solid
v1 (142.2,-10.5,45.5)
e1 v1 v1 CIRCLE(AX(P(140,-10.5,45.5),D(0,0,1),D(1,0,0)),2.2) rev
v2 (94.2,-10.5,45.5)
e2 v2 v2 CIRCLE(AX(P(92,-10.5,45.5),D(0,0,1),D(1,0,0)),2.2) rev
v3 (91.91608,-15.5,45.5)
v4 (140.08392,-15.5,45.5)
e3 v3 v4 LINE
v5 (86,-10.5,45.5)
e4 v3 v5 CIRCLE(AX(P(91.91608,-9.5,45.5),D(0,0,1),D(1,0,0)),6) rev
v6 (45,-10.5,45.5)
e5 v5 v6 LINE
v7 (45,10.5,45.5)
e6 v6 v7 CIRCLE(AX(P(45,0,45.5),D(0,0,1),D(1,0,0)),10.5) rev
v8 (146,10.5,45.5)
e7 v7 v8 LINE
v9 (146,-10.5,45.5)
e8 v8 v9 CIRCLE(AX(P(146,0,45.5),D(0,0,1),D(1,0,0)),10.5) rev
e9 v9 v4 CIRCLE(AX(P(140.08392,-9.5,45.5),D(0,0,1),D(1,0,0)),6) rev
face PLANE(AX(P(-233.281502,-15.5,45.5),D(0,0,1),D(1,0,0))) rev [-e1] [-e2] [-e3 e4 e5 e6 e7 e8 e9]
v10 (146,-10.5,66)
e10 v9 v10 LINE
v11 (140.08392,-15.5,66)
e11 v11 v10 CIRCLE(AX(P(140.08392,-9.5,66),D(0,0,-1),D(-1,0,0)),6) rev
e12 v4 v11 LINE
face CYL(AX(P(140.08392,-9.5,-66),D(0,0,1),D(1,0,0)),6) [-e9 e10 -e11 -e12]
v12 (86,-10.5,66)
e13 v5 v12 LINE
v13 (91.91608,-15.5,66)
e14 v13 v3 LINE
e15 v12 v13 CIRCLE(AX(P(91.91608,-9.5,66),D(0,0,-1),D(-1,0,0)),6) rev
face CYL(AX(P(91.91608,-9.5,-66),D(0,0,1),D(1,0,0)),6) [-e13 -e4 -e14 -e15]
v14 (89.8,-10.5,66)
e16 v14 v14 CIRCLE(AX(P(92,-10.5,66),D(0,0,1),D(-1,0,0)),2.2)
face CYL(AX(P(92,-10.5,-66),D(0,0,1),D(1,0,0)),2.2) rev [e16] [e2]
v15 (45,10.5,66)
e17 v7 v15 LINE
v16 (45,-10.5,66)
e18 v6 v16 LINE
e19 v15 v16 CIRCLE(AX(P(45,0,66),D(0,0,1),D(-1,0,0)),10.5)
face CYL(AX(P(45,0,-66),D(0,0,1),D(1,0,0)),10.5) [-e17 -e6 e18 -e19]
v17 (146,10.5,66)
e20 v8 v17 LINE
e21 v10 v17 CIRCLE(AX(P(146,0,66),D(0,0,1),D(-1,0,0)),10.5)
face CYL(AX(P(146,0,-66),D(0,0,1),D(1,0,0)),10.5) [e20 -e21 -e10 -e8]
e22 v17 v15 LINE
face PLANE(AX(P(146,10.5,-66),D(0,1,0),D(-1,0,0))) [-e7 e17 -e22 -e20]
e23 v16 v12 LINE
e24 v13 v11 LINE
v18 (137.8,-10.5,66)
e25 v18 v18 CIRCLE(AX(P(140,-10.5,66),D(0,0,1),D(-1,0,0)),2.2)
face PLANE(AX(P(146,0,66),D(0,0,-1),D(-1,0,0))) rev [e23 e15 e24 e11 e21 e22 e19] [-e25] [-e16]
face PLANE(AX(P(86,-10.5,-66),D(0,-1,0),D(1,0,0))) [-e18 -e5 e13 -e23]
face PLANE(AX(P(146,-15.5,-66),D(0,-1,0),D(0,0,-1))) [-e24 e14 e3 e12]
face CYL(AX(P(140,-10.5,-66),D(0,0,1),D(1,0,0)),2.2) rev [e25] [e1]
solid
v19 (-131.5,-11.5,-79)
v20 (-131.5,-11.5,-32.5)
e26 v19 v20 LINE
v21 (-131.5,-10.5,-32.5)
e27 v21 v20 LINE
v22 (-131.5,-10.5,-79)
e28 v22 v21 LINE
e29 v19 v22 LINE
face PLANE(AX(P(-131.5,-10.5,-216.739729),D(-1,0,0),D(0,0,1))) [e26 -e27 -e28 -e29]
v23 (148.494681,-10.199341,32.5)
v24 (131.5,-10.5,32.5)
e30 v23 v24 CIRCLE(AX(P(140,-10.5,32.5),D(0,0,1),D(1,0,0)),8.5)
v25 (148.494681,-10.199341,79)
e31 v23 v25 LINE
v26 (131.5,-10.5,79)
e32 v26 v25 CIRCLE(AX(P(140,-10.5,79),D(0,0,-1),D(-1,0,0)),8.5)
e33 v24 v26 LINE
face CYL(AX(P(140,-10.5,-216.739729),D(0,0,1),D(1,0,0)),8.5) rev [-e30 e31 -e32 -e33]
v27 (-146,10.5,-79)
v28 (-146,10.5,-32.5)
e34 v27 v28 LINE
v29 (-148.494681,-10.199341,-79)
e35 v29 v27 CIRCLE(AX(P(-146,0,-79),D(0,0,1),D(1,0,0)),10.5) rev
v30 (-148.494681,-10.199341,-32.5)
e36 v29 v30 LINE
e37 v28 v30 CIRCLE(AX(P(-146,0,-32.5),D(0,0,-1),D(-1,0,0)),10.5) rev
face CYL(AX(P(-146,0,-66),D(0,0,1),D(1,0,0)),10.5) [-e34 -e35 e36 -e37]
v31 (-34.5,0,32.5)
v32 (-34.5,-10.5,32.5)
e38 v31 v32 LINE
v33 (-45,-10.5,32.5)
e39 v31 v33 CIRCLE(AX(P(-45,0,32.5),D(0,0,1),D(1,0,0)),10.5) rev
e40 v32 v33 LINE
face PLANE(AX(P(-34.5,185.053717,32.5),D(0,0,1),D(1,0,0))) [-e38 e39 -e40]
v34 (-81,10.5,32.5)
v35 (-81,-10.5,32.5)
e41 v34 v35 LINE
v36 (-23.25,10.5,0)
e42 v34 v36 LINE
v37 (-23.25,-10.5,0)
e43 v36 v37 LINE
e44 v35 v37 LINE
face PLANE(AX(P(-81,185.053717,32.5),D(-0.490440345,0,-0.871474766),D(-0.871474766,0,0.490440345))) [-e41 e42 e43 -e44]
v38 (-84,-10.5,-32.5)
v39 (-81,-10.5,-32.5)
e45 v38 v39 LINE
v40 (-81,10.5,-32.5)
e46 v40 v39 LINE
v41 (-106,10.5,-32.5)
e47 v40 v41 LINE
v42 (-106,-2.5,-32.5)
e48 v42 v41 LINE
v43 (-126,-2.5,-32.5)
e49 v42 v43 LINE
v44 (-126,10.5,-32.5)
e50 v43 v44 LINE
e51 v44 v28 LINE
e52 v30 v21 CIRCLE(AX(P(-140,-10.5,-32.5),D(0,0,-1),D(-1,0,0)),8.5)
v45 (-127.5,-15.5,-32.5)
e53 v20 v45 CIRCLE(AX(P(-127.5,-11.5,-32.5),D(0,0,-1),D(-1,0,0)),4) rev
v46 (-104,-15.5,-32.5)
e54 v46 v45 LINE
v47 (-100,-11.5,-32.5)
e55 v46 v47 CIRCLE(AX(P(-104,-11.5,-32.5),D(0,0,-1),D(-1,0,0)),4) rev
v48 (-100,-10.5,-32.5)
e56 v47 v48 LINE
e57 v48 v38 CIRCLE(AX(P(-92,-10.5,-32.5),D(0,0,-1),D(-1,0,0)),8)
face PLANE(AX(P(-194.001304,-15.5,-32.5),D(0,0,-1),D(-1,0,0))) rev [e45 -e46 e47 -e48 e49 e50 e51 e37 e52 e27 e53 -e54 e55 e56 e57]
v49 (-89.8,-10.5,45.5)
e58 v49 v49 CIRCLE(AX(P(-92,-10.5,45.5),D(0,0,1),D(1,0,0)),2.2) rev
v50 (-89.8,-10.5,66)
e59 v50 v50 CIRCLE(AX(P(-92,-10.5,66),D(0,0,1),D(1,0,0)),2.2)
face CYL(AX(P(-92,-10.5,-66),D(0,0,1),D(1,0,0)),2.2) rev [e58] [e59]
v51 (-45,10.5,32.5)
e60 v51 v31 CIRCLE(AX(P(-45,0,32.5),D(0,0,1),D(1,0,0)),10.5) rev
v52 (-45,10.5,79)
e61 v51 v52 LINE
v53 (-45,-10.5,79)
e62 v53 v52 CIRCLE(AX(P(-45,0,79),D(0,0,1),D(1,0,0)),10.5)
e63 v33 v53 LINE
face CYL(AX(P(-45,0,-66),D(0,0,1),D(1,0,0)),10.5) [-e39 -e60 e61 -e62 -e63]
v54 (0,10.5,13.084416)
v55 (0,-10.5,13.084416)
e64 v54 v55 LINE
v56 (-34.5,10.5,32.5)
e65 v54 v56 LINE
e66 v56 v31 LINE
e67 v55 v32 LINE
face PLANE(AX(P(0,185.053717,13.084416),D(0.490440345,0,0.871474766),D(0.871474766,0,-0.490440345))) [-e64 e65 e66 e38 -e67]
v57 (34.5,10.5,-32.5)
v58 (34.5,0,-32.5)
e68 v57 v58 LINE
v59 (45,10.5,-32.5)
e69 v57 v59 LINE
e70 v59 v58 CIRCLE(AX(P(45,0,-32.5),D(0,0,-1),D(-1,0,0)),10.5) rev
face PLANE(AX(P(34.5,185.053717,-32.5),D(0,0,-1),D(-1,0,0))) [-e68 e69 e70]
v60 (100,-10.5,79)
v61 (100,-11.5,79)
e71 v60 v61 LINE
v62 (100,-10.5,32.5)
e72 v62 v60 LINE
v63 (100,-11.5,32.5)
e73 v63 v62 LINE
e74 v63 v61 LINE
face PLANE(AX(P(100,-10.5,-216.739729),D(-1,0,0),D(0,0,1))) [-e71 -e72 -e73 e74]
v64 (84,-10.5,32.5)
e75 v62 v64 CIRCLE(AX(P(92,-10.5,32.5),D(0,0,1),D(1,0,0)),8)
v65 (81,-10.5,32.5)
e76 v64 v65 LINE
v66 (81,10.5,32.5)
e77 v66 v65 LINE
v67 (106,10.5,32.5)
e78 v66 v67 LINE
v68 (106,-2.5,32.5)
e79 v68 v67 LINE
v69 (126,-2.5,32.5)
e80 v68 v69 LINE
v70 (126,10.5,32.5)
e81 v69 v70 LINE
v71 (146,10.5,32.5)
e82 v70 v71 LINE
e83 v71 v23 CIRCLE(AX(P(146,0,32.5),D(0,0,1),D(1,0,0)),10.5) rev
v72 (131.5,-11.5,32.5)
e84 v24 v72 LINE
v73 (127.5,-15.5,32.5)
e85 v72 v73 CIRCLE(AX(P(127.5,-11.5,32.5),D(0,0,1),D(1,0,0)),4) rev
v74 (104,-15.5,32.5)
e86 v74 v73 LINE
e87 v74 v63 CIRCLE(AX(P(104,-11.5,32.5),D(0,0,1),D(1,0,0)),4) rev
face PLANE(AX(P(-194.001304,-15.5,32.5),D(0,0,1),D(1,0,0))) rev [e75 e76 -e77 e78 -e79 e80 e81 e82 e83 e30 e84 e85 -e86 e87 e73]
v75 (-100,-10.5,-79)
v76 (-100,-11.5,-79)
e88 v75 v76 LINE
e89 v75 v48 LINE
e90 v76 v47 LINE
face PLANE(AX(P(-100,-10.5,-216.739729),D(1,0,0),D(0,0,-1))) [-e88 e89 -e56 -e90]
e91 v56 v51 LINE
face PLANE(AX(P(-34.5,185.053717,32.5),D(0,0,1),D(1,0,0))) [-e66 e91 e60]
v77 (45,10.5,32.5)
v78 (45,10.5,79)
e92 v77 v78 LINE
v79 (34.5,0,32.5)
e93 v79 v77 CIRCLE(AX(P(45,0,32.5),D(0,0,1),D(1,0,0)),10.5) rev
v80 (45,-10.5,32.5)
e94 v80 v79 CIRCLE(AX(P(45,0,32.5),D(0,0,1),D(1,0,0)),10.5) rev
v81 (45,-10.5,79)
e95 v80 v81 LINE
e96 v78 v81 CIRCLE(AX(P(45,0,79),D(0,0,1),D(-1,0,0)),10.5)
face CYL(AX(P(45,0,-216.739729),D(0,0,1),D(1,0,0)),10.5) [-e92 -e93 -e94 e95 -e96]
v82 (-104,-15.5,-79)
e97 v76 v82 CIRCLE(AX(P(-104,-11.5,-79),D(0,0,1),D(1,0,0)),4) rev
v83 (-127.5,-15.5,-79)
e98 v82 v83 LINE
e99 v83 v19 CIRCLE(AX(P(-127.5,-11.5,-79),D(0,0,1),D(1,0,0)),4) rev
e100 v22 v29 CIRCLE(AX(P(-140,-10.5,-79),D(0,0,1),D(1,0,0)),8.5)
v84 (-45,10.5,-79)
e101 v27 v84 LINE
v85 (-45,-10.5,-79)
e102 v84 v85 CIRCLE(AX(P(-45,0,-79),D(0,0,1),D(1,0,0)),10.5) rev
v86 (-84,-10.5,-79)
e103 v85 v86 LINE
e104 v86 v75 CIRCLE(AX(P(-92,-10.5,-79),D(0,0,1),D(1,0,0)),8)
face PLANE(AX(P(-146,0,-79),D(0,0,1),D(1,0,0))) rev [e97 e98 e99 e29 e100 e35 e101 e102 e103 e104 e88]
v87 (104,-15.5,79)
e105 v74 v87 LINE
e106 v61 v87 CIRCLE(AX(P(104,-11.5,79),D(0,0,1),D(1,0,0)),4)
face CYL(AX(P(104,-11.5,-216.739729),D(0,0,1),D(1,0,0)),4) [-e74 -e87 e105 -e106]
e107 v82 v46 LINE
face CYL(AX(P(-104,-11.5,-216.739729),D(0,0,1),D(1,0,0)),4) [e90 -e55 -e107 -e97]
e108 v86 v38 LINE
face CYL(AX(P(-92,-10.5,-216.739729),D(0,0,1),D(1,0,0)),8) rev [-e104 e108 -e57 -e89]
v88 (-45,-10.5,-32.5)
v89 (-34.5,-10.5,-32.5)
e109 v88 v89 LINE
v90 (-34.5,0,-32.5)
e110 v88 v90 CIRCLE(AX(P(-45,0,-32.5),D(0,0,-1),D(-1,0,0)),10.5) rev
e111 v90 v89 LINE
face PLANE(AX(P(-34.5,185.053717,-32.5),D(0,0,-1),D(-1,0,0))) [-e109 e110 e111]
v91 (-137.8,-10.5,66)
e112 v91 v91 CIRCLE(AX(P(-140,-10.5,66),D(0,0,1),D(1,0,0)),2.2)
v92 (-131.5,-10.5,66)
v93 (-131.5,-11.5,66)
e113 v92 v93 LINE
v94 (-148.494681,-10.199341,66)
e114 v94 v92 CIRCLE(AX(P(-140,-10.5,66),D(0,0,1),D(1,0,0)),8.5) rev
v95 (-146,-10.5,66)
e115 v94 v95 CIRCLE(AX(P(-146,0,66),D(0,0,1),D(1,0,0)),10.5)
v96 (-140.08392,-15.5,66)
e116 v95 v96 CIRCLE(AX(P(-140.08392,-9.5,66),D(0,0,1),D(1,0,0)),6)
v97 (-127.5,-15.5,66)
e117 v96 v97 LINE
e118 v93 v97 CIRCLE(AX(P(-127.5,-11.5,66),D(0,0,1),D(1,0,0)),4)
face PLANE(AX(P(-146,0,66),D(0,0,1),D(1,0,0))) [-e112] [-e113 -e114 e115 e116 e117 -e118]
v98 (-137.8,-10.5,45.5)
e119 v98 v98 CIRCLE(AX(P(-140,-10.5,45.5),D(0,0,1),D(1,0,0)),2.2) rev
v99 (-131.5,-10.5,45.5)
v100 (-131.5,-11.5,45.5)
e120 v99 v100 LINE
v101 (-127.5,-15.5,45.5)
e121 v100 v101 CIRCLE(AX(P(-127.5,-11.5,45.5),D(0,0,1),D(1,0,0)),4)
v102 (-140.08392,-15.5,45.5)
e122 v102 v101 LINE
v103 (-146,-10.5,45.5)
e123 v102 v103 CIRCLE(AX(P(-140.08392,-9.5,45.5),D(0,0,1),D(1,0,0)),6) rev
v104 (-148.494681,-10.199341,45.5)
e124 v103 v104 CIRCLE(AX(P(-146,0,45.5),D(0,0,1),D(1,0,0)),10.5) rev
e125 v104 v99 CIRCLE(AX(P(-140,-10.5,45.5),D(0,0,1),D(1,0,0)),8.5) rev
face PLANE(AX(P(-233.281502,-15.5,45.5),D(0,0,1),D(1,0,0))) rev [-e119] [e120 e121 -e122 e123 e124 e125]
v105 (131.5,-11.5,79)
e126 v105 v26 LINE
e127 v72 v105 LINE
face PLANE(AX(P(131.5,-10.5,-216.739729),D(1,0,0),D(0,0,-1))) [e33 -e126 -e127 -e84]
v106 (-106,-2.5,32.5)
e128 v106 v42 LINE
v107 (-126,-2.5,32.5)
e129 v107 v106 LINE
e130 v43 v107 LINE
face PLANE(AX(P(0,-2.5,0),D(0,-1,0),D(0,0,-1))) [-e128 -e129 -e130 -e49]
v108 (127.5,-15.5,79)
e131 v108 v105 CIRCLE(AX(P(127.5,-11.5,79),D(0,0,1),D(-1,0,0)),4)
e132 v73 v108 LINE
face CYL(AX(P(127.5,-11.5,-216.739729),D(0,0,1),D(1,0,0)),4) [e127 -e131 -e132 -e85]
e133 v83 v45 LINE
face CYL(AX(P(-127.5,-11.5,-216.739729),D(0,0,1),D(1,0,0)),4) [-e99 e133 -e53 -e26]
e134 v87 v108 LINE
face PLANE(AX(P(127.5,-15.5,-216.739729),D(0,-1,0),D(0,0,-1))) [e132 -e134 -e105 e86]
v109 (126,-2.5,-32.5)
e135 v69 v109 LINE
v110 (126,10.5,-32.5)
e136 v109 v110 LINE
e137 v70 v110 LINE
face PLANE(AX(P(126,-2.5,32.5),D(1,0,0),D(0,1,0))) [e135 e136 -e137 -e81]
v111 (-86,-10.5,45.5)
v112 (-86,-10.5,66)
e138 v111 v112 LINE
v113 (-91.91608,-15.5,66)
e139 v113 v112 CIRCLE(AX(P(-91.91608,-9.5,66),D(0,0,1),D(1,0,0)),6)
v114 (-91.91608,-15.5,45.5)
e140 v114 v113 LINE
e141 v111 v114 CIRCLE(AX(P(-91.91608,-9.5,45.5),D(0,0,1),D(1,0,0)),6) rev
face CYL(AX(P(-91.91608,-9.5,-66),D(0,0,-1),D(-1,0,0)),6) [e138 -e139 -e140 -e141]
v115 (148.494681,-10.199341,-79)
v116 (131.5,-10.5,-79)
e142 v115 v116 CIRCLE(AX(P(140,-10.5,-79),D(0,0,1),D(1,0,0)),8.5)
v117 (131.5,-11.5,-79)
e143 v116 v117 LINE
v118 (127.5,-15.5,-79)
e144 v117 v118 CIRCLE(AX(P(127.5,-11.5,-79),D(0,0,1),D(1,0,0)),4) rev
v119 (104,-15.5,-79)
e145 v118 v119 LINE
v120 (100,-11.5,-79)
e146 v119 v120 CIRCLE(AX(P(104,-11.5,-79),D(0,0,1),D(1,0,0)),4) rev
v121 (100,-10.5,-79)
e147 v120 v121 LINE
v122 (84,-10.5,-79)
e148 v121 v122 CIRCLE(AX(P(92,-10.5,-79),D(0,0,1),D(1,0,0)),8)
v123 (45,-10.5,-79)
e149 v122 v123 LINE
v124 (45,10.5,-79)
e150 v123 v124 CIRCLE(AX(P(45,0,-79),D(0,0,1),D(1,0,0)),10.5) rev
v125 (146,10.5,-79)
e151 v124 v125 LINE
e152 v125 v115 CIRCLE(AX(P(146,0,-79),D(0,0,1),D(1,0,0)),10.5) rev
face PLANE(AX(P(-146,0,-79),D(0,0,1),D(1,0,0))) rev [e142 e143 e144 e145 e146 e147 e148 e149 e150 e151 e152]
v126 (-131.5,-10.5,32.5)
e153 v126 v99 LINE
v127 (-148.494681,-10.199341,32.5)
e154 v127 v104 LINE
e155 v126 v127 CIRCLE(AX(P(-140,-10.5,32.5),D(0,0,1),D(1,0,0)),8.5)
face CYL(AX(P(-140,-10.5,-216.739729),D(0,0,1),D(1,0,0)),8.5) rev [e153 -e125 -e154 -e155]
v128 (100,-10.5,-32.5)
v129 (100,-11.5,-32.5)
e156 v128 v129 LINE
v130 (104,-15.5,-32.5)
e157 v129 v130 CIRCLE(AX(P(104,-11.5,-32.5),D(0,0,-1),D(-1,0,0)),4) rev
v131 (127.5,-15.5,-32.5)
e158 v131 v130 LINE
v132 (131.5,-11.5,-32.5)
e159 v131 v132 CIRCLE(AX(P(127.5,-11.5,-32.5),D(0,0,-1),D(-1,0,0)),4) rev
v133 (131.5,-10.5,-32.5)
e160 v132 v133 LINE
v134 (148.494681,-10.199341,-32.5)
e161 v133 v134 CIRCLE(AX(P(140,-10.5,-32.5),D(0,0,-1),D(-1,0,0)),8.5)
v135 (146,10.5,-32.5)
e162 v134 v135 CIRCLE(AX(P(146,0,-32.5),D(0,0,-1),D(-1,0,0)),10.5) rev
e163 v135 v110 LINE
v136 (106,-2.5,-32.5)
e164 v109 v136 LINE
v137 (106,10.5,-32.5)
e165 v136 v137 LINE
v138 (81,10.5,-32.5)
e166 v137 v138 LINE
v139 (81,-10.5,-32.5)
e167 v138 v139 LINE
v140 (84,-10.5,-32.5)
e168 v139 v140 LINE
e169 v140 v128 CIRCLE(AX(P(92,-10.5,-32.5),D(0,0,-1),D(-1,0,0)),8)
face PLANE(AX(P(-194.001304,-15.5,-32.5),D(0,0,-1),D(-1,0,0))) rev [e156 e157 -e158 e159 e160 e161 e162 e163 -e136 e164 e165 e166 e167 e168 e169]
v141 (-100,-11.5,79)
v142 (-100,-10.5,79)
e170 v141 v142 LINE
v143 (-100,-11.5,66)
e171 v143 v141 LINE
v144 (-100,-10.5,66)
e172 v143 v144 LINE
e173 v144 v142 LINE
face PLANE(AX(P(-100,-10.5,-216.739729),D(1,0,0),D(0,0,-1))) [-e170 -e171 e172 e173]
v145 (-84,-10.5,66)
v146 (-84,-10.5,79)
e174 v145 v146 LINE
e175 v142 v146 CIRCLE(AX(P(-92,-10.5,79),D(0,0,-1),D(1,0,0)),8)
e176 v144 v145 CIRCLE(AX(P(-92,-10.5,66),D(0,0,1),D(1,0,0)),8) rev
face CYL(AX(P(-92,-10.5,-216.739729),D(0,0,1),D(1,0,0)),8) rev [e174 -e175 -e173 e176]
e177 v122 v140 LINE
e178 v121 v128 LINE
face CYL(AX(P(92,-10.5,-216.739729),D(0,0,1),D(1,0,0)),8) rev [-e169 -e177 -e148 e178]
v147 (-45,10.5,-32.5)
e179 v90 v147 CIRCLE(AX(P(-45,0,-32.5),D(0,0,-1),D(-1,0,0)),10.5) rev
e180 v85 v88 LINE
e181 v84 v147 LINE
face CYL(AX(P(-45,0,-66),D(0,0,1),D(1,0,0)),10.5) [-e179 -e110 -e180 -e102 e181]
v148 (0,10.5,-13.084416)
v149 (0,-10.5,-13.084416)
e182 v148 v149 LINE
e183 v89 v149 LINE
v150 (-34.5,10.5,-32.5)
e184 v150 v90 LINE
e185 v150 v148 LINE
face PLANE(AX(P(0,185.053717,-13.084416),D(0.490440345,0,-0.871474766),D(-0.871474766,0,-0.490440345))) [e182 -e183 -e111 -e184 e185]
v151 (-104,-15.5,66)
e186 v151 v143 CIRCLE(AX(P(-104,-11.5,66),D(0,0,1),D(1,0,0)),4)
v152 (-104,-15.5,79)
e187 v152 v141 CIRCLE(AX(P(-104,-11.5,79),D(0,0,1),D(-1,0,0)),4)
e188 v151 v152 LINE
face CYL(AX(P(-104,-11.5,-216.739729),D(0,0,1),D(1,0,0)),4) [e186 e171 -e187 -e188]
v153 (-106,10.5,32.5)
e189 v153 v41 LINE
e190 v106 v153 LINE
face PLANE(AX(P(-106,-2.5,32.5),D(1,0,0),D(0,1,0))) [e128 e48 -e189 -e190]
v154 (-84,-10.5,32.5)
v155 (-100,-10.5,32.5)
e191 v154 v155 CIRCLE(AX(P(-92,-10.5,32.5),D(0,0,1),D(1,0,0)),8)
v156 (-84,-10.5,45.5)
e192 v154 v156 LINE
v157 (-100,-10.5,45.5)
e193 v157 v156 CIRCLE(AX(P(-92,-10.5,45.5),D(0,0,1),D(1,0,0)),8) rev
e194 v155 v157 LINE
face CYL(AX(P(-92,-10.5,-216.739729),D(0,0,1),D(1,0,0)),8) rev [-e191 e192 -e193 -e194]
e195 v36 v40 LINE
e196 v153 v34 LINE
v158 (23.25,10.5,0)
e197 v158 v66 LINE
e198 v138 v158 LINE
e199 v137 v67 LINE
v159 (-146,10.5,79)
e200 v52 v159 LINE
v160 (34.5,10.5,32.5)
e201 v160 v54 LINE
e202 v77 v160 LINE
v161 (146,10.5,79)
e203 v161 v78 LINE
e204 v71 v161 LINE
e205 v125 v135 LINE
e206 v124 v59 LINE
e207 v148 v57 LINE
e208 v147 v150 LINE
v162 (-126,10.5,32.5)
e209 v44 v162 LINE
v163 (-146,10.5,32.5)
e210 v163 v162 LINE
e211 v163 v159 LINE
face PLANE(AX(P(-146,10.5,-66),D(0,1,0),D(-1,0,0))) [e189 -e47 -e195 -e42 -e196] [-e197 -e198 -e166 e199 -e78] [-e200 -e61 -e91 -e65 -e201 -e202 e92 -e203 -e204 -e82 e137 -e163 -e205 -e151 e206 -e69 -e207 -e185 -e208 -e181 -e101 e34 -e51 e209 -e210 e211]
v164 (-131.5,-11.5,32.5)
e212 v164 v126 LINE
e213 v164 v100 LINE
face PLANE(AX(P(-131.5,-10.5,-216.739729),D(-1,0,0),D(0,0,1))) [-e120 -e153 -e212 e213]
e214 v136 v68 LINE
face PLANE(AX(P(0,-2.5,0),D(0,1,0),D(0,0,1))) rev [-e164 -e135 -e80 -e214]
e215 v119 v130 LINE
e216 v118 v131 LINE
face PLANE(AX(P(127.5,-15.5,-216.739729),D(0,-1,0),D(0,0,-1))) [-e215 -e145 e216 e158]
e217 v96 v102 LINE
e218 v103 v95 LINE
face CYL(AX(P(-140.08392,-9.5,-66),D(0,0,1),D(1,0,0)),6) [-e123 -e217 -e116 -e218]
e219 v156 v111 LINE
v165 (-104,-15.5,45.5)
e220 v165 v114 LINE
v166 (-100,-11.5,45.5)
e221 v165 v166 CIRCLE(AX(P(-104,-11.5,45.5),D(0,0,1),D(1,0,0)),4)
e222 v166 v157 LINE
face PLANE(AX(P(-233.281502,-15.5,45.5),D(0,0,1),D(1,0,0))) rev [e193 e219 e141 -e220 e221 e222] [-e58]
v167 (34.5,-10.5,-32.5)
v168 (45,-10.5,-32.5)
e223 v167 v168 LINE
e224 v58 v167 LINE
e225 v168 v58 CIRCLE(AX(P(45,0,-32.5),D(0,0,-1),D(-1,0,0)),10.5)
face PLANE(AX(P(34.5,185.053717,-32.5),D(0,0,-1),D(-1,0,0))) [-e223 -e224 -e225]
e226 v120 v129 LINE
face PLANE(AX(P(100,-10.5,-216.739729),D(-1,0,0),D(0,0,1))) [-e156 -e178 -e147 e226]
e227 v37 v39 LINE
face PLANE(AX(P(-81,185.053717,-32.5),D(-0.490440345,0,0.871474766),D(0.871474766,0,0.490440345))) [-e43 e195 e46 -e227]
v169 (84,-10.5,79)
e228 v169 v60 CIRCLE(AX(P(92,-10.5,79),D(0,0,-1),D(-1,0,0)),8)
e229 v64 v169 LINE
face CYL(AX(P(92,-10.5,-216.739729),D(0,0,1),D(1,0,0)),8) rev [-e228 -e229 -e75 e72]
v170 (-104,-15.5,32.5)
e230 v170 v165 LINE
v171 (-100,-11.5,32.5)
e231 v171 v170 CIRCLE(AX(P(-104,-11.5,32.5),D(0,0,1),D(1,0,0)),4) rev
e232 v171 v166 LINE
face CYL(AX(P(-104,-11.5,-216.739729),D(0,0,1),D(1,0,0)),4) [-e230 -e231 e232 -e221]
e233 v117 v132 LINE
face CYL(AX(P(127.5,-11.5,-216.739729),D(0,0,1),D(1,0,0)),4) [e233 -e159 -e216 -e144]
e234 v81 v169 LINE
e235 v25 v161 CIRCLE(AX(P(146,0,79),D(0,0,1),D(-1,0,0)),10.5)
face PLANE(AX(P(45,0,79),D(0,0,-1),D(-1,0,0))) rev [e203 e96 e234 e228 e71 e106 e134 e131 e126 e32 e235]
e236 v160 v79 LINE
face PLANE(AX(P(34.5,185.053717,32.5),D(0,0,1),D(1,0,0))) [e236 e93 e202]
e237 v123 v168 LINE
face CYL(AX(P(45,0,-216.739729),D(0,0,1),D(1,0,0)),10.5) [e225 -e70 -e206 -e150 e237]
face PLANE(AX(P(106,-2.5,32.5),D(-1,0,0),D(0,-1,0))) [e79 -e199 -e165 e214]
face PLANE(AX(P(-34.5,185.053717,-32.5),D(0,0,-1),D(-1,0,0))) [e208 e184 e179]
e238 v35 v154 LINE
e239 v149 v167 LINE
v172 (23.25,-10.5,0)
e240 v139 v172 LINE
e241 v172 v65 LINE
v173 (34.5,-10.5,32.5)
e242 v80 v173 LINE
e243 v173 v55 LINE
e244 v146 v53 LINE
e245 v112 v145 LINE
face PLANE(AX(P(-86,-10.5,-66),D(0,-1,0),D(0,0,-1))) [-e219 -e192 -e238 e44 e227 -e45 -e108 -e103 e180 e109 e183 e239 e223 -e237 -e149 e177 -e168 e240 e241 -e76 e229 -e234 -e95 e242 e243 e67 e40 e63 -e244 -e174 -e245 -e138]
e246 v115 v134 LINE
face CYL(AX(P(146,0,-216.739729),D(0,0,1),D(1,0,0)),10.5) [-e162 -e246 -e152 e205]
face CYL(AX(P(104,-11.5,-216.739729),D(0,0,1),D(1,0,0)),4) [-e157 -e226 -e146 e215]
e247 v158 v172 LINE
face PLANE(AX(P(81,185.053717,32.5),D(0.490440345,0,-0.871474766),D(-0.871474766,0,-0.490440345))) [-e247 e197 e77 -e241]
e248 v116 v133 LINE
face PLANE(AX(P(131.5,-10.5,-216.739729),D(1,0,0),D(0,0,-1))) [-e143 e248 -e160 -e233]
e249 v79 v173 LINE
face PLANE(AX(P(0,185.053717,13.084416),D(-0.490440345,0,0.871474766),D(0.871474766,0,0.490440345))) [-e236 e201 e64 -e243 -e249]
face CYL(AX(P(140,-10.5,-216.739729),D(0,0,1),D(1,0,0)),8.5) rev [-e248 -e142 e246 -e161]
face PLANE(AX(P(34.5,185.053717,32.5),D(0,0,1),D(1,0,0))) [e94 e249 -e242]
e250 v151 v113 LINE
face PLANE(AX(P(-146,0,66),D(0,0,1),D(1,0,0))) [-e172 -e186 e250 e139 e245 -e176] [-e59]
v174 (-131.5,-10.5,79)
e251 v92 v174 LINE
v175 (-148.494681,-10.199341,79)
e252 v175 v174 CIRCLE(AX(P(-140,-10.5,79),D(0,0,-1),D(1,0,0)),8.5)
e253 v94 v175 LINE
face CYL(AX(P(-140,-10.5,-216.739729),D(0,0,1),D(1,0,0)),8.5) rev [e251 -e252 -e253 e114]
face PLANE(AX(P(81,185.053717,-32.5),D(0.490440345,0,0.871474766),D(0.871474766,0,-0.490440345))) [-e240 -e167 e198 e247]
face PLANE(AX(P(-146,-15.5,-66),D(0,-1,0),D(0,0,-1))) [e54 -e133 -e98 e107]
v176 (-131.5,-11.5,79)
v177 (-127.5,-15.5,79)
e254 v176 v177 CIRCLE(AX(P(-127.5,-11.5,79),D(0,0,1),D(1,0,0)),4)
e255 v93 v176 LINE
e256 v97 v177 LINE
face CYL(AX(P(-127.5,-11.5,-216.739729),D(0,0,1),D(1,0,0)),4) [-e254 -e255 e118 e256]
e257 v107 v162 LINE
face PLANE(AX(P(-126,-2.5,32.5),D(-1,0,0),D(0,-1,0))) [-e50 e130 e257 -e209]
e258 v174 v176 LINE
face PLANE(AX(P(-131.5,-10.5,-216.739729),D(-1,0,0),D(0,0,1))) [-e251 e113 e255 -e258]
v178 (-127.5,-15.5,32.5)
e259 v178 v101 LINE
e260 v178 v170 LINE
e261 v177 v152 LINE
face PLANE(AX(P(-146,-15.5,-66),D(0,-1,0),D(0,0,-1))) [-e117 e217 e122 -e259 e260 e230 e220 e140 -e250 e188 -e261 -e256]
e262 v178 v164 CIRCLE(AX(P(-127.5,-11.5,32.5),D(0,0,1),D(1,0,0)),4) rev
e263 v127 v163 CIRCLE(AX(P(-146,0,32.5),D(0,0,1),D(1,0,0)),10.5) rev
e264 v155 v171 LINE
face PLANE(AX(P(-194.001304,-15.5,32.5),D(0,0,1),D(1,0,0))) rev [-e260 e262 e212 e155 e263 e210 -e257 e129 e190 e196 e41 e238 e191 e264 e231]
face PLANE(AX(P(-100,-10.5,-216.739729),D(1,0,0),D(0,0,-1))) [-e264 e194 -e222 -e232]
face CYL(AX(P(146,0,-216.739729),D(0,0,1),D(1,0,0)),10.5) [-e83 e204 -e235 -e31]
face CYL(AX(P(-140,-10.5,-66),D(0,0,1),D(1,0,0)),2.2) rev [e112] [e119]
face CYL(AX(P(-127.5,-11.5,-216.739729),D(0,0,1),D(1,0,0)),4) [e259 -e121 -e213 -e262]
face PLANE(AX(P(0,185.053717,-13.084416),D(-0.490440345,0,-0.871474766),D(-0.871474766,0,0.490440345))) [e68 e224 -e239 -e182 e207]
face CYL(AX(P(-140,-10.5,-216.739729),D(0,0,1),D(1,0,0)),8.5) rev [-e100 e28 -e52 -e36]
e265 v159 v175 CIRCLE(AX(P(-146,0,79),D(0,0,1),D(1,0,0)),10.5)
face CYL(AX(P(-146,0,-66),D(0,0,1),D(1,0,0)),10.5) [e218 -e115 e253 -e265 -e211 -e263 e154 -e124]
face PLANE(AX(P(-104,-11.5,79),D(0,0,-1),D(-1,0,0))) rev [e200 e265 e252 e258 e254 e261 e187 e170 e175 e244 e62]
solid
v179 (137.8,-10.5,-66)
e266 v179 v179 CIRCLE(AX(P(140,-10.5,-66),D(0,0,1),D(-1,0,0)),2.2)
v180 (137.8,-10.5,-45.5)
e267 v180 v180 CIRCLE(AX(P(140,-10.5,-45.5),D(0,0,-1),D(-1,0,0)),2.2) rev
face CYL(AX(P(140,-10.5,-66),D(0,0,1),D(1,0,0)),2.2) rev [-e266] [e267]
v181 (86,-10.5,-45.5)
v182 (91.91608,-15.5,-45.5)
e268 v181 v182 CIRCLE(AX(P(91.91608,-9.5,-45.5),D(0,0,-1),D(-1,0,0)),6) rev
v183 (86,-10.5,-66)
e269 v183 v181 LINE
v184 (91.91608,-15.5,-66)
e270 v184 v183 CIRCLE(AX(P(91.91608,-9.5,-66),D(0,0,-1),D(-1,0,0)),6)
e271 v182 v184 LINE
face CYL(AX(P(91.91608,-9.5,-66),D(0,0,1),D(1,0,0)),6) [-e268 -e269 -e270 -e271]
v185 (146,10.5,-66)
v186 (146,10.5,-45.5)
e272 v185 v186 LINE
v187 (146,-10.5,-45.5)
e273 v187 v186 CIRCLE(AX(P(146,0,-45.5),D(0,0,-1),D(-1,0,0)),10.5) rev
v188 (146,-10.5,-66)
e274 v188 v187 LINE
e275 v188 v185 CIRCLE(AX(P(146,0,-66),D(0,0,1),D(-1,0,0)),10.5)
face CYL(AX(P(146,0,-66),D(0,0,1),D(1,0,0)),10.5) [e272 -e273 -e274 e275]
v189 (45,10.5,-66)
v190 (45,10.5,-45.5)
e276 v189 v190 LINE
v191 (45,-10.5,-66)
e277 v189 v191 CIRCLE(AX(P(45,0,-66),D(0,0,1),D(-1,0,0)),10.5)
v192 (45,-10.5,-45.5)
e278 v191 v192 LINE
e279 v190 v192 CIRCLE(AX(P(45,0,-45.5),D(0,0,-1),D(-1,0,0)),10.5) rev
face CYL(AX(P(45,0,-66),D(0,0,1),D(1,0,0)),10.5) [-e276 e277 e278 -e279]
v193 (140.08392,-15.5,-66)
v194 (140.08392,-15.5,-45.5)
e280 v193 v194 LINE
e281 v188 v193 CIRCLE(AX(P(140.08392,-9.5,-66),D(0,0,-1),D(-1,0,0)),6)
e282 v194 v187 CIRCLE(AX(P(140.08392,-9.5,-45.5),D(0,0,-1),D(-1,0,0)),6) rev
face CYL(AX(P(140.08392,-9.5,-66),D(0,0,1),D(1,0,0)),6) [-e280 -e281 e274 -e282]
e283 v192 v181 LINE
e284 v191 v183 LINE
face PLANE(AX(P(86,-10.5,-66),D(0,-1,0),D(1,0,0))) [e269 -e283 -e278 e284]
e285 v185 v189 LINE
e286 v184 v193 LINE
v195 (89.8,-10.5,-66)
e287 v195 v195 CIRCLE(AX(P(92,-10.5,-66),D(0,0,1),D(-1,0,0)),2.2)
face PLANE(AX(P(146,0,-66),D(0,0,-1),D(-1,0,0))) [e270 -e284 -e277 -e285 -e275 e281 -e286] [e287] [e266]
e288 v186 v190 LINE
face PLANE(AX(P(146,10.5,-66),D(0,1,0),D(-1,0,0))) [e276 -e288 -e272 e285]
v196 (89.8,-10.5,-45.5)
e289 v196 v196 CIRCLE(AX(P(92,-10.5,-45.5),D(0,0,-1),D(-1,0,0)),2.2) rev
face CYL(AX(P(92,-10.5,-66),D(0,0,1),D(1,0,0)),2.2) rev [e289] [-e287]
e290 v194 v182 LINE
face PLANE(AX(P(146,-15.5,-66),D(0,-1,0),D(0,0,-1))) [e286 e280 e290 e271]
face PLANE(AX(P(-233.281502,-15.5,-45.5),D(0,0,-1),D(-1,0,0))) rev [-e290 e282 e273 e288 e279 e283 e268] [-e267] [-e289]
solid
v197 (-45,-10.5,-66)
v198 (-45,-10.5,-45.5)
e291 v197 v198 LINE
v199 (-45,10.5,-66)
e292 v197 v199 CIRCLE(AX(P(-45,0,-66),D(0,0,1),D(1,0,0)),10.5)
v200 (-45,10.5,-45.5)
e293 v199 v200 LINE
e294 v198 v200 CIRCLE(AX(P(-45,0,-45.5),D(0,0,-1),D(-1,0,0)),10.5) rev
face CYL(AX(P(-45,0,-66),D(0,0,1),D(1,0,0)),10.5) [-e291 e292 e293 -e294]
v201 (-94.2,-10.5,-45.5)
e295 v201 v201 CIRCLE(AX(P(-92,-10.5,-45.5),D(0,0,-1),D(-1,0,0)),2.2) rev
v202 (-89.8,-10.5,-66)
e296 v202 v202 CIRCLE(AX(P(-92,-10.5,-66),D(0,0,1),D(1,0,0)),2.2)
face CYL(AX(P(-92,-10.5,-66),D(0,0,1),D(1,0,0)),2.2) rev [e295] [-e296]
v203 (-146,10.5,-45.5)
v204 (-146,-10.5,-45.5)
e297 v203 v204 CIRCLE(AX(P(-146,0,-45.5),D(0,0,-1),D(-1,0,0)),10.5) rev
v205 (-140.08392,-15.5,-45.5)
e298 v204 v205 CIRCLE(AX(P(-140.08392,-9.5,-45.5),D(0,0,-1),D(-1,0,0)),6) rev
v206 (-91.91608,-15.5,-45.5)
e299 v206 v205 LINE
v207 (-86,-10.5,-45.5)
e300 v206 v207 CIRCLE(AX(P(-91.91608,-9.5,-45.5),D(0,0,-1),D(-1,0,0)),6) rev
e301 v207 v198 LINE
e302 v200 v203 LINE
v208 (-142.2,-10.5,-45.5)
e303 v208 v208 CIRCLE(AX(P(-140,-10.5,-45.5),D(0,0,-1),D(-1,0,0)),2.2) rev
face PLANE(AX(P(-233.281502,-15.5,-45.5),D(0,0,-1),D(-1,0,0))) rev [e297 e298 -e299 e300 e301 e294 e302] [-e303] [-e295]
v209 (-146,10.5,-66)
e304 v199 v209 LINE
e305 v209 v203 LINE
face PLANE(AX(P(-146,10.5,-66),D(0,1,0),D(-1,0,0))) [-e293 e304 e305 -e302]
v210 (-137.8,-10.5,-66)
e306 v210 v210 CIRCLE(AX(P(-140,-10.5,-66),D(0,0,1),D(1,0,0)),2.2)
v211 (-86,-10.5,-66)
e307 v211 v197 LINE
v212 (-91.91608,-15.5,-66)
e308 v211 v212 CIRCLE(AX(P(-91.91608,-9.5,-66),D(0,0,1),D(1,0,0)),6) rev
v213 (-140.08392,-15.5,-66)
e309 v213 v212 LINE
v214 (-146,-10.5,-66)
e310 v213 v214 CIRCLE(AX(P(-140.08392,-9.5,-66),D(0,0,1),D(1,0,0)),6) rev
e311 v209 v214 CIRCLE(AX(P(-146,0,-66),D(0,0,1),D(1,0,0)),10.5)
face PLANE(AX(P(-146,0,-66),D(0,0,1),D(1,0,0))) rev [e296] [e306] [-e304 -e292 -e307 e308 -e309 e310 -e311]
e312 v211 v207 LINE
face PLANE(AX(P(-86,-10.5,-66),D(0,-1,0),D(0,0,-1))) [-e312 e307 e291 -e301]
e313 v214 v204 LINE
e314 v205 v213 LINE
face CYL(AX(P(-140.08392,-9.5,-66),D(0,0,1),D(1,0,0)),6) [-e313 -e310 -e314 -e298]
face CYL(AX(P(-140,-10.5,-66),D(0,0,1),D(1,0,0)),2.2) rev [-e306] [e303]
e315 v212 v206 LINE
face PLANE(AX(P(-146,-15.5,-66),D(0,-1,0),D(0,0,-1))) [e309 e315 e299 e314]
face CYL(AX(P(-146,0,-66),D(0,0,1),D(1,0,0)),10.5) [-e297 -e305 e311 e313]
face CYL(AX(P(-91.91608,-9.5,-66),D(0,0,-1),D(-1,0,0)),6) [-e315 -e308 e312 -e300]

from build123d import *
from build123d.topology import SkipClean

# Parameters (mm, degrees)
BOSS_EXTRUDE9_DEPTH        = 66
BOSS_EXTRUDE9_DEPTH_BACK   = 66
SKETCH14_R                 = 2.2
BOSS_EXTRUDE9_2_DEPTH      = 66
BOSS_EXTRUDE9_2_DEPTH_BACK = 66
SKETCH16_W                 = 465.18759692
SKETCH16_H                 = 91
CUT_EXTRUDE7_DEPTH         = 172.826220351
FILLET1_R                  = 6
FILLET2_R                  = 6
FILLET3_R                  = 6
FILLET5_R                  = 6
BOSS_EXTRUDE10_DEPTH       = 13
BOSS_EXTRUDE10_DEPTH_BACK  = 145
SKETCH22_W                 = 388.002608152
SKETCH22_H                 = 65
CUT_EXTRUDE8_DEPTH         = 178.22654993
BOSS_EXTRUDE11_REACH       = 178.562
SKETCH25_W                 = 20
SKETCH25_H                 = 65
BOSS_EXTRUDE12_DEPTH       = 13


with BuildPart() as part:
    # Sketch14 → Boss-Extrude9 (new, two sides: drawn at the far end of the back side and taken through both)
    with BuildSketch(Plane.XY.offset(-BOSS_EXTRUDE9_DEPTH_BACK)):
        with BuildLine():
            Line((-146, 10.5), (-45, 10.5))
            ThreePointArc((-45, 10.5), (-34.5, 0), (-45, -10.5))
            Line((-45, -10.5), (-86, -10.5))
            Line((-86, -10.5), (-86, -15.5))
            Line((-86, -15.5), (-146, -15.5))
            Line((-146, -15.5), (-146, -10.5))
            ThreePointArc((-146, -10.5), (-156.5, 0), (-146, 10.5))
        make_face()
        with Locations((-140, -10.5)):
            Circle(SKETCH14_R, mode=Mode.SUBTRACT)
        with Locations((-92, -10.5)):
            Circle(SKETCH14_R, mode=Mode.SUBTRACT)
    extrude(amount=BOSS_EXTRUDE9_DEPTH + BOSS_EXTRUDE9_DEPTH_BACK)


with BuildPart() as body_2:
    # Sketch14 → Boss-Extrude9 2 (new, two sides: drawn at the far end of the back side and taken through both)
    with BuildSketch(Plane.XY.offset(-BOSS_EXTRUDE9_2_DEPTH_BACK)):
        with BuildLine():
            Line((146, -15.5), (146, -10.5))
            ThreePointArc((146, -10.5), (156.5, 0), (146, 10.5))
            Line((146, 10.5), (45, 10.5))
            ThreePointArc((45, 10.5), (34.5, 0), (45, -10.5))
            Line((45, -10.5), (86, -10.5))
            Line((86, -10.5), (86, -15.5))
            Line((86, -15.5), (146, -15.5))
        make_face()
        with Locations(Location((92, -10.5, 0), (0, 0, 180))):
            Circle(SKETCH14_R, mode=Mode.SUBTRACT)
        with Locations(Location((140, -10.5, 0), (0, 0, 180))):
            Circle(SKETCH14_R, mode=Mode.SUBTRACT)
    extrude(amount=BOSS_EXTRUDE9_2_DEPTH + BOSS_EXTRUDE9_2_DEPTH_BACK)


with BuildPart() as cut_extrude7_tool:
    # Sketch16 → Cut-Extrude7 (new, through all)
    with BuildSketch(Plane(origin=(0, 10.5, 0), x_dir=(1, 0, 0), z_dir=(0, 1, 0))):
        with Locations((-0.687703518, 0)):
            Rectangle(SKETCH16_W, SKETCH16_H)
    extrude(amount=-CUT_EXTRUDE7_DEPTH)


with BuildPart() as part_1:
    add(part.part)

    # Cut-Extrude7: cut by cut_extrude7_tool
    add(cut_extrude7_tool.part, mode=Mode.SUBTRACT)


with BuildPart() as body_2_1:
    add(body_2.part)

    # Cut-Extrude7: cut by cut_extrude7_tool
    add(cut_extrude7_tool.part, mode=Mode.SUBTRACT)


with BuildPart() as cut_extrude7_piece_1:
    # of the separate pieces the step leaves, piece 1, a body of its own (cut_extrude7_pieces)
    add(part_1.part.solids().sort_by_distance((-45, -10.5, -66))[0])

    # Fillet2
    # the kernel refuses this fillet: 6 mm, written as the material it takes off along each edge
    with BuildSketch(Plane(origin=(-86, -15.5, -30.709800542), x_dir=(0, 1, 0), z_dir=(0, 0, -1))) as fillet2_piece_1:
        with BuildLine():
            CenterArc((6, -5.916079783), FILLET2_R, 99.594068227, 80.405931773)
            Line((0, -5.916079783), (-0.12, -5.916079783))
            Line((-0.12, -5.916079783), (-0.12, 0))
            Line((-0.12, 0), (0, 0.12))
            ThreePointArc((0, 0.12), (2.5, 0.12), (4.98, 0.118321596))
            Line((4.98, 0.118321596), (5, 0))
        make_face()
    extrude(amount=50.080398916, mode=Mode.SUBTRACT)
    with BuildSketch(Plane(origin=(-146, -15.5, -30.709800542), x_dir=(1, 0, 0), z_dir=(0, 0, -1))) as fillet2_piece_2:
        with BuildLine():
            CenterArc((5.916079783, -6), FILLET2_R, 90, 80.405931773)
            Line((0, -5), (-0.118321596, -4.98))
            ThreePointArc((-0.118321596, -4.98), (-0.12, -2.5), (-0.12, 0))
            Line((-0.12, 0), (0, 0.12))
            Line((0, 0.12), (5.916079783, 0.12))
            Line((5.916079783, 0.12), (5.916079783, 0))
        make_face()
    extrude(amount=50.080398916, mode=Mode.SUBTRACT)


with BuildPart() as cut_extrude7_piece_2:
    # of the separate pieces the step leaves, piece 2, a body of its own (cut_extrude7_pieces)
    add(part_1.part.solids().sort_by_distance((-45, -10.5, 45.5))[0])

    # Fillet1
    # the kernel refuses this fillet: 6 mm, written as the material it takes off along each edge
    with BuildSketch(Plane(origin=(-146, -15.5, 80.790199458), x_dir=(0, 1, 0), z_dir=(0, 0, -1))) as fillet1_piece_1:
        with BuildLine():
            CenterArc((6, 5.916079783), FILLET1_R, 180, 80.405931773)
            Line((0, 5.916079783), (-0.12, 5.916079783))
            Line((-0.12, 5.916079783), (-0.12, 0))
            Line((-0.12, 0), (0, -0.12))
            ThreePointArc((0, -0.12), (2.5, -0.12), (4.98, -0.118321596))
            Line((4.98, -0.118321596), (5, 0))
        make_face()
    extrude(amount=50.080398916, mode=Mode.SUBTRACT)
    with BuildSketch(Plane(origin=(-86, -15.5, 80.790199458), x_dir=(0, 1, 0), z_dir=(0, 0, -1))) as fillet1_piece_2:
        with BuildLine():
            CenterArc((6, -5.916079783), FILLET1_R, 99.594068227, 80.405931773)
            Line((0, -5.916079783), (-0.12, -5.916079783))
            Line((-0.12, -5.916079783), (-0.12, 0))
            Line((-0.12, 0), (0, 0.12))
            ThreePointArc((0, 0.12), (2.5, 0.12), (4.98, 0.118321596))
            Line((4.98, 0.118321596), (5, 0))
        make_face()
    extrude(amount=50.080398916, mode=Mode.SUBTRACT)

    # Sketch21 → Boss-Extrude10 (add, two sides: drawn at the far end of the back side and taken through both)
    with SkipClean():  # the faces are left unmerged after this step: merging them gives an invalid solid
        with BuildSketch(Plane.XY.offset(66).offset(-BOSS_EXTRUDE10_DEPTH_BACK)):
            with BuildLine():
                Line((-131.5, -10.5), (-131.5, -11.5))
                ThreePointArc((-131.5, -11.5), (-130.328427125, -14.328427125), (-127.5, -15.5))
                Line((-127.5, -15.5), (-104, -15.5))
                ThreePointArc((-104, -15.5), (-101.171572875, -14.328427125), (-100, -11.5))
                Line((-100, -11.5), (-100, -10.5))
                ThreePointArc((-100, -10.5), (-92, -2.5), (-84, -10.5))
                Line((-84, -10.5), (-45, -10.5))
                ThreePointArc((-45, -10.5), (-34.5, 0), (-45, 10.5))
                Line((-45, 10.5), (-146, 10.5))
                ThreePointArc((-146, 10.5), (-156.424564396, 1.256366645), (-148.494680951, -10.199341496))
                ThreePointArc((-148.494680951, -10.199341496), (-139.849647225, -2.001329866), (-131.5, -10.5))
            make_face()
            with BuildLine():
                Line((45, 10.5), (146, 10.5))
                ThreePointArc((146, 10.5), (156.424564396, 1.256366645), (148.494680951, -10.199341496))
                ThreePointArc((148.494680951, -10.199341496), (139.849647225, -2.001329866), (131.5, -10.5))
                Line((131.5, -10.5), (131.5, -11.5))
                ThreePointArc((131.5, -11.5), (130.328427125, -14.328427125), (127.5, -15.5))
                Line((127.5, -15.5), (104, -15.5))
                ThreePointArc((104, -15.5), (101.171572875, -14.328427125), (100, -11.5))
                Line((100, -11.5), (100, -10.5))
                ThreePointArc((100, -10.5), (92, -2.5), (84, -10.5))
                Line((84, -10.5), (45, -10.5))
                ThreePointArc((45, -10.5), (34.5, 0), (45, 10.5))
            make_face()
        extrude(amount=BOSS_EXTRUDE10_DEPTH + BOSS_EXTRUDE10_DEPTH_BACK)


with BuildPart() as cut_extrude7_piece_1_of_body_2:
    # of the separate pieces the step leaves, piece 1, a body of its own (cut_extrude7_pieces_of_body_2)
    add(body_2_1.part.solids().sort_by_distance((146, -15.5, -45.5))[0])

    # Fillet5
    # the kernel refuses this fillet: 6 mm, written as the material it takes off along each edge
    with BuildSketch(Plane(origin=(86, -15.5, -30.709800542), x_dir=(1, 0, 0), z_dir=(0, 0, -1))) as fillet5_piece_1:
        with BuildLine():
            CenterArc((5.916079783, -6), FILLET5_R, 90, 80.405931773)
            Line((0, -5), (-0.118321596, -4.98))
            ThreePointArc((-0.118321596, -4.98), (-0.12, -2.5), (-0.12, 0))
            Line((-0.12, 0), (0, 0.12))
            Line((0, 0.12), (5.916079783, 0.12))
            Line((5.916079783, 0.12), (5.916079783, 0))
        make_face()
    extrude(amount=50.080398916, mode=Mode.SUBTRACT)
    with BuildSketch(Plane(origin=(146, -15.5, -30.709800542), x_dir=(0, 1, 0), z_dir=(0, 0, -1))) as fillet5_piece_2:
        with BuildLine():
            CenterArc((6, -5.916079783), FILLET5_R, 99.594068227, 80.405931773)
            Line((0, -5.916079783), (-0.12, -5.916079783))
            Line((-0.12, -5.916079783), (-0.12, 0))
            Line((-0.12, 0), (0, 0.12))
            ThreePointArc((0, 0.12), (2.5, 0.12), (4.98, 0.118321596))
            Line((4.98, 0.118321596), (5, 0))
        make_face()
    extrude(amount=50.080398916, mode=Mode.SUBTRACT)


with BuildPart() as cut_extrude7_piece_2_of_body_2:
    # of the separate pieces the step leaves, piece 2, a body of its own (cut_extrude7_pieces_of_body_2)
    add(body_2_1.part.solids().sort_by_distance((146, -15.5, 66))[0])

    # Fillet3
    # the kernel refuses this fillet: 6 mm, written as the material it takes off along each edge
    with BuildSketch(Plane(origin=(146, -15.5, 80.790199458), x_dir=(0, 1, 0), z_dir=(0, 0, -1))) as fillet3_piece_1:
        with BuildLine():
            CenterArc((6, -5.916079783), FILLET3_R, 99.594068227, 80.405931773)
            Line((0, -5.916079783), (-0.12, -5.916079783))
            Line((-0.12, -5.916079783), (-0.12, 0))
            Line((-0.12, 0), (0, 0.12))
            ThreePointArc((0, 0.12), (2.5, 0.12), (4.98, 0.118321596))
            Line((4.98, 0.118321596), (5, 0))
        make_face()
    extrude(amount=50.080398916, mode=Mode.SUBTRACT)
    with BuildSketch(Plane(origin=(86, -15.5, 80.790199458), x_dir=(1, 0, 0), z_dir=(0, 0, -1))) as fillet3_piece_2:
        with BuildLine():
            CenterArc((5.916079783, -6), FILLET3_R, 90, 80.405931773)
            Line((0, -5), (-0.118321596, -4.98))
            ThreePointArc((-0.118321596, -4.98), (-0.12, -2.5), (-0.12, 0))
            Line((-0.12, 0), (0, 0.12))
            Line((0, 0.12), (5.916079783, 0.12))
            Line((5.916079783, 0.12), (5.916079783, 0))
        make_face()
    extrude(amount=50.080398916, mode=Mode.SUBTRACT)


with BuildPart() as boss_extrude10_piece_1:
    # of the separate pieces the step leaves, piece 1, a body of its own (boss_extrude10_pieces)
    add(cut_extrude7_piece_2.part.solids().sort_by_distance((-84, -10.5, 45.5))[0])


with BuildPart() as boss_extrude10_piece_2:
    # of the separate pieces the step leaves, piece 2, a body of its own (boss_extrude10_pieces)
    add(cut_extrude7_piece_2.part.solids().sort_by_distance((84, -10.5, 79))[0])


with BuildPart() as cut_extrude8_tool:
    # Sketch22 → Cut-Extrude8 (new, through all)
    with SkipClean():  # the faces are left unmerged after this step: merging them gives an invalid solid
        with BuildSketch(Plane(origin=(0, 10.5, 0), x_dir=(1, 0, 0), z_dir=(0, 1, 0))):
            Rectangle(SKETCH22_W, SKETCH22_H)
        extrude(amount=-CUT_EXTRUDE8_DEPTH)


with BuildPart() as boss_extrude10_piece_1_1:
    with SkipClean():  # the faces are left unmerged after this step: merging them gives an invalid solid
        add(boss_extrude10_piece_1.part)

        # Cut-Extrude8: cut by cut_extrude8_tool
        add(cut_extrude8_tool.part, mode=Mode.SUBTRACT)


with BuildPart() as boss_extrude10_piece_2_1:
    with SkipClean():  # the faces are left unmerged after this step: merging them gives an invalid solid
        add(boss_extrude10_piece_2.part)

        # Cut-Extrude8: cut by cut_extrude8_tool
        add(cut_extrude8_tool.part, mode=Mode.SUBTRACT)


with BuildPart() as cut_extrude8_piece_1:
    # of the separate pieces the step leaves, piece 1, a body of its own (cut_extrude8_pieces)
    add(boss_extrude10_piece_1_1.part.solids().sort_by_distance((-84, -10.5, 45.5))[0])

    # Boss-Extrude11: up to this face of the body (flat: up to its plane)
    boss_extrude11_end = Plane(cut_extrude8_piece_1.part.faces().sort_by_distance((-95.5, 10.5, 55.75))[0])
    # Sketch24 → Boss-Extrude11 (add, up to the picked face)
    with BuildSketch(Plane.XZ.offset(10.5), mode=Mode.PRIVATE) as boss_extrude11_sk1:
        Polygon((81, -32.5), (23.25, 0), (81, 32.5), (34.5, 32.5), (0, 13.084415584), (-34.5, 32.5), (-81, 32.5), (-23.25, 0), (-81, -32.5), (-34.5, -32.5), (0, -13.084415584), (34.5, -32.5), align=None)
    boss_extrude11_tool1 = split(extrude(boss_extrude11_sk1.sketch, amount=-BOSS_EXTRUDE11_REACH, mode=Mode.PRIVATE), bisect_by=boss_extrude11_end, keep=Keep.BOTH, mode=Mode.PRIVATE)


with BuildPart() as cut_extrude8_piece_2:
    # of the separate pieces the step leaves, piece 2, a body of its own (cut_extrude8_pieces)
    add(boss_extrude10_piece_1_1.part.solids().sort_by_distance((-84, -10.5, -79))[0])


with BuildPart() as cut_extrude8_piece_1_of_boss_extrude10_p:
    # of the separate pieces the step leaves, piece 1, a body of its own (cut_extrude8_pieces_of_boss_extrude10_pi)
    add(boss_extrude10_piece_2_1.part.solids().sort_by_distance((84, -10.5, -79))[0])


with BuildPart() as cut_extrude8_piece_2_of_boss_extrude10_p:
    # of the separate pieces the step leaves, piece 2, a body of its own (cut_extrude8_pieces_of_boss_extrude10_pi)
    add(boss_extrude10_piece_2_1.part.solids().sort_by_distance((84, -10.5, 32.5))[0])


with BuildPart() as cut_extrude8_piece_1_1:
    add(cut_extrude8_piece_1.part)

    add(cut_extrude8_piece_2.part)  # Boss-Extrude11 merges Cut-Extrude8 piece 2

    add(cut_extrude8_piece_1_of_boss_extrude10_p.part)  # Boss-Extrude11 merges Cut-Extrude8 piece 1 of Boss-Extrude10 p

    add(cut_extrude8_piece_2_of_boss_extrude10_p.part)  # Boss-Extrude11 merges Cut-Extrude8 piece 2 of Boss-Extrude10 p
    add(boss_extrude11_tool1.solids().sort_by(Axis((0, -10.5, 0), (0, 1, 0)))[0])

    # Sketch25 → Boss-Extrude12 (add)
    with SkipClean():  # the faces are left unmerged after this step: merging them gives an invalid solid
        with BuildSketch(Plane(origin=(0, 10.5, 0), x_dir=(1, 0, 0), z_dir=(0, 1, 0))):
            with Locations((-116, 0)):
                Rectangle(SKETCH25_W, SKETCH25_H)
            with Locations((116, 0)):
                Rectangle(SKETCH25_W, SKETCH25_H)
        extrude(amount=-BOSS_EXTRUDE12_DEPTH)


solid = Compound([cut_extrude7_piece_1.part, cut_extrude7_piece_1_of_body_2.part, cut_extrude7_piece_2_of_body_2.part, cut_extrude8_piece_1_1.part])
